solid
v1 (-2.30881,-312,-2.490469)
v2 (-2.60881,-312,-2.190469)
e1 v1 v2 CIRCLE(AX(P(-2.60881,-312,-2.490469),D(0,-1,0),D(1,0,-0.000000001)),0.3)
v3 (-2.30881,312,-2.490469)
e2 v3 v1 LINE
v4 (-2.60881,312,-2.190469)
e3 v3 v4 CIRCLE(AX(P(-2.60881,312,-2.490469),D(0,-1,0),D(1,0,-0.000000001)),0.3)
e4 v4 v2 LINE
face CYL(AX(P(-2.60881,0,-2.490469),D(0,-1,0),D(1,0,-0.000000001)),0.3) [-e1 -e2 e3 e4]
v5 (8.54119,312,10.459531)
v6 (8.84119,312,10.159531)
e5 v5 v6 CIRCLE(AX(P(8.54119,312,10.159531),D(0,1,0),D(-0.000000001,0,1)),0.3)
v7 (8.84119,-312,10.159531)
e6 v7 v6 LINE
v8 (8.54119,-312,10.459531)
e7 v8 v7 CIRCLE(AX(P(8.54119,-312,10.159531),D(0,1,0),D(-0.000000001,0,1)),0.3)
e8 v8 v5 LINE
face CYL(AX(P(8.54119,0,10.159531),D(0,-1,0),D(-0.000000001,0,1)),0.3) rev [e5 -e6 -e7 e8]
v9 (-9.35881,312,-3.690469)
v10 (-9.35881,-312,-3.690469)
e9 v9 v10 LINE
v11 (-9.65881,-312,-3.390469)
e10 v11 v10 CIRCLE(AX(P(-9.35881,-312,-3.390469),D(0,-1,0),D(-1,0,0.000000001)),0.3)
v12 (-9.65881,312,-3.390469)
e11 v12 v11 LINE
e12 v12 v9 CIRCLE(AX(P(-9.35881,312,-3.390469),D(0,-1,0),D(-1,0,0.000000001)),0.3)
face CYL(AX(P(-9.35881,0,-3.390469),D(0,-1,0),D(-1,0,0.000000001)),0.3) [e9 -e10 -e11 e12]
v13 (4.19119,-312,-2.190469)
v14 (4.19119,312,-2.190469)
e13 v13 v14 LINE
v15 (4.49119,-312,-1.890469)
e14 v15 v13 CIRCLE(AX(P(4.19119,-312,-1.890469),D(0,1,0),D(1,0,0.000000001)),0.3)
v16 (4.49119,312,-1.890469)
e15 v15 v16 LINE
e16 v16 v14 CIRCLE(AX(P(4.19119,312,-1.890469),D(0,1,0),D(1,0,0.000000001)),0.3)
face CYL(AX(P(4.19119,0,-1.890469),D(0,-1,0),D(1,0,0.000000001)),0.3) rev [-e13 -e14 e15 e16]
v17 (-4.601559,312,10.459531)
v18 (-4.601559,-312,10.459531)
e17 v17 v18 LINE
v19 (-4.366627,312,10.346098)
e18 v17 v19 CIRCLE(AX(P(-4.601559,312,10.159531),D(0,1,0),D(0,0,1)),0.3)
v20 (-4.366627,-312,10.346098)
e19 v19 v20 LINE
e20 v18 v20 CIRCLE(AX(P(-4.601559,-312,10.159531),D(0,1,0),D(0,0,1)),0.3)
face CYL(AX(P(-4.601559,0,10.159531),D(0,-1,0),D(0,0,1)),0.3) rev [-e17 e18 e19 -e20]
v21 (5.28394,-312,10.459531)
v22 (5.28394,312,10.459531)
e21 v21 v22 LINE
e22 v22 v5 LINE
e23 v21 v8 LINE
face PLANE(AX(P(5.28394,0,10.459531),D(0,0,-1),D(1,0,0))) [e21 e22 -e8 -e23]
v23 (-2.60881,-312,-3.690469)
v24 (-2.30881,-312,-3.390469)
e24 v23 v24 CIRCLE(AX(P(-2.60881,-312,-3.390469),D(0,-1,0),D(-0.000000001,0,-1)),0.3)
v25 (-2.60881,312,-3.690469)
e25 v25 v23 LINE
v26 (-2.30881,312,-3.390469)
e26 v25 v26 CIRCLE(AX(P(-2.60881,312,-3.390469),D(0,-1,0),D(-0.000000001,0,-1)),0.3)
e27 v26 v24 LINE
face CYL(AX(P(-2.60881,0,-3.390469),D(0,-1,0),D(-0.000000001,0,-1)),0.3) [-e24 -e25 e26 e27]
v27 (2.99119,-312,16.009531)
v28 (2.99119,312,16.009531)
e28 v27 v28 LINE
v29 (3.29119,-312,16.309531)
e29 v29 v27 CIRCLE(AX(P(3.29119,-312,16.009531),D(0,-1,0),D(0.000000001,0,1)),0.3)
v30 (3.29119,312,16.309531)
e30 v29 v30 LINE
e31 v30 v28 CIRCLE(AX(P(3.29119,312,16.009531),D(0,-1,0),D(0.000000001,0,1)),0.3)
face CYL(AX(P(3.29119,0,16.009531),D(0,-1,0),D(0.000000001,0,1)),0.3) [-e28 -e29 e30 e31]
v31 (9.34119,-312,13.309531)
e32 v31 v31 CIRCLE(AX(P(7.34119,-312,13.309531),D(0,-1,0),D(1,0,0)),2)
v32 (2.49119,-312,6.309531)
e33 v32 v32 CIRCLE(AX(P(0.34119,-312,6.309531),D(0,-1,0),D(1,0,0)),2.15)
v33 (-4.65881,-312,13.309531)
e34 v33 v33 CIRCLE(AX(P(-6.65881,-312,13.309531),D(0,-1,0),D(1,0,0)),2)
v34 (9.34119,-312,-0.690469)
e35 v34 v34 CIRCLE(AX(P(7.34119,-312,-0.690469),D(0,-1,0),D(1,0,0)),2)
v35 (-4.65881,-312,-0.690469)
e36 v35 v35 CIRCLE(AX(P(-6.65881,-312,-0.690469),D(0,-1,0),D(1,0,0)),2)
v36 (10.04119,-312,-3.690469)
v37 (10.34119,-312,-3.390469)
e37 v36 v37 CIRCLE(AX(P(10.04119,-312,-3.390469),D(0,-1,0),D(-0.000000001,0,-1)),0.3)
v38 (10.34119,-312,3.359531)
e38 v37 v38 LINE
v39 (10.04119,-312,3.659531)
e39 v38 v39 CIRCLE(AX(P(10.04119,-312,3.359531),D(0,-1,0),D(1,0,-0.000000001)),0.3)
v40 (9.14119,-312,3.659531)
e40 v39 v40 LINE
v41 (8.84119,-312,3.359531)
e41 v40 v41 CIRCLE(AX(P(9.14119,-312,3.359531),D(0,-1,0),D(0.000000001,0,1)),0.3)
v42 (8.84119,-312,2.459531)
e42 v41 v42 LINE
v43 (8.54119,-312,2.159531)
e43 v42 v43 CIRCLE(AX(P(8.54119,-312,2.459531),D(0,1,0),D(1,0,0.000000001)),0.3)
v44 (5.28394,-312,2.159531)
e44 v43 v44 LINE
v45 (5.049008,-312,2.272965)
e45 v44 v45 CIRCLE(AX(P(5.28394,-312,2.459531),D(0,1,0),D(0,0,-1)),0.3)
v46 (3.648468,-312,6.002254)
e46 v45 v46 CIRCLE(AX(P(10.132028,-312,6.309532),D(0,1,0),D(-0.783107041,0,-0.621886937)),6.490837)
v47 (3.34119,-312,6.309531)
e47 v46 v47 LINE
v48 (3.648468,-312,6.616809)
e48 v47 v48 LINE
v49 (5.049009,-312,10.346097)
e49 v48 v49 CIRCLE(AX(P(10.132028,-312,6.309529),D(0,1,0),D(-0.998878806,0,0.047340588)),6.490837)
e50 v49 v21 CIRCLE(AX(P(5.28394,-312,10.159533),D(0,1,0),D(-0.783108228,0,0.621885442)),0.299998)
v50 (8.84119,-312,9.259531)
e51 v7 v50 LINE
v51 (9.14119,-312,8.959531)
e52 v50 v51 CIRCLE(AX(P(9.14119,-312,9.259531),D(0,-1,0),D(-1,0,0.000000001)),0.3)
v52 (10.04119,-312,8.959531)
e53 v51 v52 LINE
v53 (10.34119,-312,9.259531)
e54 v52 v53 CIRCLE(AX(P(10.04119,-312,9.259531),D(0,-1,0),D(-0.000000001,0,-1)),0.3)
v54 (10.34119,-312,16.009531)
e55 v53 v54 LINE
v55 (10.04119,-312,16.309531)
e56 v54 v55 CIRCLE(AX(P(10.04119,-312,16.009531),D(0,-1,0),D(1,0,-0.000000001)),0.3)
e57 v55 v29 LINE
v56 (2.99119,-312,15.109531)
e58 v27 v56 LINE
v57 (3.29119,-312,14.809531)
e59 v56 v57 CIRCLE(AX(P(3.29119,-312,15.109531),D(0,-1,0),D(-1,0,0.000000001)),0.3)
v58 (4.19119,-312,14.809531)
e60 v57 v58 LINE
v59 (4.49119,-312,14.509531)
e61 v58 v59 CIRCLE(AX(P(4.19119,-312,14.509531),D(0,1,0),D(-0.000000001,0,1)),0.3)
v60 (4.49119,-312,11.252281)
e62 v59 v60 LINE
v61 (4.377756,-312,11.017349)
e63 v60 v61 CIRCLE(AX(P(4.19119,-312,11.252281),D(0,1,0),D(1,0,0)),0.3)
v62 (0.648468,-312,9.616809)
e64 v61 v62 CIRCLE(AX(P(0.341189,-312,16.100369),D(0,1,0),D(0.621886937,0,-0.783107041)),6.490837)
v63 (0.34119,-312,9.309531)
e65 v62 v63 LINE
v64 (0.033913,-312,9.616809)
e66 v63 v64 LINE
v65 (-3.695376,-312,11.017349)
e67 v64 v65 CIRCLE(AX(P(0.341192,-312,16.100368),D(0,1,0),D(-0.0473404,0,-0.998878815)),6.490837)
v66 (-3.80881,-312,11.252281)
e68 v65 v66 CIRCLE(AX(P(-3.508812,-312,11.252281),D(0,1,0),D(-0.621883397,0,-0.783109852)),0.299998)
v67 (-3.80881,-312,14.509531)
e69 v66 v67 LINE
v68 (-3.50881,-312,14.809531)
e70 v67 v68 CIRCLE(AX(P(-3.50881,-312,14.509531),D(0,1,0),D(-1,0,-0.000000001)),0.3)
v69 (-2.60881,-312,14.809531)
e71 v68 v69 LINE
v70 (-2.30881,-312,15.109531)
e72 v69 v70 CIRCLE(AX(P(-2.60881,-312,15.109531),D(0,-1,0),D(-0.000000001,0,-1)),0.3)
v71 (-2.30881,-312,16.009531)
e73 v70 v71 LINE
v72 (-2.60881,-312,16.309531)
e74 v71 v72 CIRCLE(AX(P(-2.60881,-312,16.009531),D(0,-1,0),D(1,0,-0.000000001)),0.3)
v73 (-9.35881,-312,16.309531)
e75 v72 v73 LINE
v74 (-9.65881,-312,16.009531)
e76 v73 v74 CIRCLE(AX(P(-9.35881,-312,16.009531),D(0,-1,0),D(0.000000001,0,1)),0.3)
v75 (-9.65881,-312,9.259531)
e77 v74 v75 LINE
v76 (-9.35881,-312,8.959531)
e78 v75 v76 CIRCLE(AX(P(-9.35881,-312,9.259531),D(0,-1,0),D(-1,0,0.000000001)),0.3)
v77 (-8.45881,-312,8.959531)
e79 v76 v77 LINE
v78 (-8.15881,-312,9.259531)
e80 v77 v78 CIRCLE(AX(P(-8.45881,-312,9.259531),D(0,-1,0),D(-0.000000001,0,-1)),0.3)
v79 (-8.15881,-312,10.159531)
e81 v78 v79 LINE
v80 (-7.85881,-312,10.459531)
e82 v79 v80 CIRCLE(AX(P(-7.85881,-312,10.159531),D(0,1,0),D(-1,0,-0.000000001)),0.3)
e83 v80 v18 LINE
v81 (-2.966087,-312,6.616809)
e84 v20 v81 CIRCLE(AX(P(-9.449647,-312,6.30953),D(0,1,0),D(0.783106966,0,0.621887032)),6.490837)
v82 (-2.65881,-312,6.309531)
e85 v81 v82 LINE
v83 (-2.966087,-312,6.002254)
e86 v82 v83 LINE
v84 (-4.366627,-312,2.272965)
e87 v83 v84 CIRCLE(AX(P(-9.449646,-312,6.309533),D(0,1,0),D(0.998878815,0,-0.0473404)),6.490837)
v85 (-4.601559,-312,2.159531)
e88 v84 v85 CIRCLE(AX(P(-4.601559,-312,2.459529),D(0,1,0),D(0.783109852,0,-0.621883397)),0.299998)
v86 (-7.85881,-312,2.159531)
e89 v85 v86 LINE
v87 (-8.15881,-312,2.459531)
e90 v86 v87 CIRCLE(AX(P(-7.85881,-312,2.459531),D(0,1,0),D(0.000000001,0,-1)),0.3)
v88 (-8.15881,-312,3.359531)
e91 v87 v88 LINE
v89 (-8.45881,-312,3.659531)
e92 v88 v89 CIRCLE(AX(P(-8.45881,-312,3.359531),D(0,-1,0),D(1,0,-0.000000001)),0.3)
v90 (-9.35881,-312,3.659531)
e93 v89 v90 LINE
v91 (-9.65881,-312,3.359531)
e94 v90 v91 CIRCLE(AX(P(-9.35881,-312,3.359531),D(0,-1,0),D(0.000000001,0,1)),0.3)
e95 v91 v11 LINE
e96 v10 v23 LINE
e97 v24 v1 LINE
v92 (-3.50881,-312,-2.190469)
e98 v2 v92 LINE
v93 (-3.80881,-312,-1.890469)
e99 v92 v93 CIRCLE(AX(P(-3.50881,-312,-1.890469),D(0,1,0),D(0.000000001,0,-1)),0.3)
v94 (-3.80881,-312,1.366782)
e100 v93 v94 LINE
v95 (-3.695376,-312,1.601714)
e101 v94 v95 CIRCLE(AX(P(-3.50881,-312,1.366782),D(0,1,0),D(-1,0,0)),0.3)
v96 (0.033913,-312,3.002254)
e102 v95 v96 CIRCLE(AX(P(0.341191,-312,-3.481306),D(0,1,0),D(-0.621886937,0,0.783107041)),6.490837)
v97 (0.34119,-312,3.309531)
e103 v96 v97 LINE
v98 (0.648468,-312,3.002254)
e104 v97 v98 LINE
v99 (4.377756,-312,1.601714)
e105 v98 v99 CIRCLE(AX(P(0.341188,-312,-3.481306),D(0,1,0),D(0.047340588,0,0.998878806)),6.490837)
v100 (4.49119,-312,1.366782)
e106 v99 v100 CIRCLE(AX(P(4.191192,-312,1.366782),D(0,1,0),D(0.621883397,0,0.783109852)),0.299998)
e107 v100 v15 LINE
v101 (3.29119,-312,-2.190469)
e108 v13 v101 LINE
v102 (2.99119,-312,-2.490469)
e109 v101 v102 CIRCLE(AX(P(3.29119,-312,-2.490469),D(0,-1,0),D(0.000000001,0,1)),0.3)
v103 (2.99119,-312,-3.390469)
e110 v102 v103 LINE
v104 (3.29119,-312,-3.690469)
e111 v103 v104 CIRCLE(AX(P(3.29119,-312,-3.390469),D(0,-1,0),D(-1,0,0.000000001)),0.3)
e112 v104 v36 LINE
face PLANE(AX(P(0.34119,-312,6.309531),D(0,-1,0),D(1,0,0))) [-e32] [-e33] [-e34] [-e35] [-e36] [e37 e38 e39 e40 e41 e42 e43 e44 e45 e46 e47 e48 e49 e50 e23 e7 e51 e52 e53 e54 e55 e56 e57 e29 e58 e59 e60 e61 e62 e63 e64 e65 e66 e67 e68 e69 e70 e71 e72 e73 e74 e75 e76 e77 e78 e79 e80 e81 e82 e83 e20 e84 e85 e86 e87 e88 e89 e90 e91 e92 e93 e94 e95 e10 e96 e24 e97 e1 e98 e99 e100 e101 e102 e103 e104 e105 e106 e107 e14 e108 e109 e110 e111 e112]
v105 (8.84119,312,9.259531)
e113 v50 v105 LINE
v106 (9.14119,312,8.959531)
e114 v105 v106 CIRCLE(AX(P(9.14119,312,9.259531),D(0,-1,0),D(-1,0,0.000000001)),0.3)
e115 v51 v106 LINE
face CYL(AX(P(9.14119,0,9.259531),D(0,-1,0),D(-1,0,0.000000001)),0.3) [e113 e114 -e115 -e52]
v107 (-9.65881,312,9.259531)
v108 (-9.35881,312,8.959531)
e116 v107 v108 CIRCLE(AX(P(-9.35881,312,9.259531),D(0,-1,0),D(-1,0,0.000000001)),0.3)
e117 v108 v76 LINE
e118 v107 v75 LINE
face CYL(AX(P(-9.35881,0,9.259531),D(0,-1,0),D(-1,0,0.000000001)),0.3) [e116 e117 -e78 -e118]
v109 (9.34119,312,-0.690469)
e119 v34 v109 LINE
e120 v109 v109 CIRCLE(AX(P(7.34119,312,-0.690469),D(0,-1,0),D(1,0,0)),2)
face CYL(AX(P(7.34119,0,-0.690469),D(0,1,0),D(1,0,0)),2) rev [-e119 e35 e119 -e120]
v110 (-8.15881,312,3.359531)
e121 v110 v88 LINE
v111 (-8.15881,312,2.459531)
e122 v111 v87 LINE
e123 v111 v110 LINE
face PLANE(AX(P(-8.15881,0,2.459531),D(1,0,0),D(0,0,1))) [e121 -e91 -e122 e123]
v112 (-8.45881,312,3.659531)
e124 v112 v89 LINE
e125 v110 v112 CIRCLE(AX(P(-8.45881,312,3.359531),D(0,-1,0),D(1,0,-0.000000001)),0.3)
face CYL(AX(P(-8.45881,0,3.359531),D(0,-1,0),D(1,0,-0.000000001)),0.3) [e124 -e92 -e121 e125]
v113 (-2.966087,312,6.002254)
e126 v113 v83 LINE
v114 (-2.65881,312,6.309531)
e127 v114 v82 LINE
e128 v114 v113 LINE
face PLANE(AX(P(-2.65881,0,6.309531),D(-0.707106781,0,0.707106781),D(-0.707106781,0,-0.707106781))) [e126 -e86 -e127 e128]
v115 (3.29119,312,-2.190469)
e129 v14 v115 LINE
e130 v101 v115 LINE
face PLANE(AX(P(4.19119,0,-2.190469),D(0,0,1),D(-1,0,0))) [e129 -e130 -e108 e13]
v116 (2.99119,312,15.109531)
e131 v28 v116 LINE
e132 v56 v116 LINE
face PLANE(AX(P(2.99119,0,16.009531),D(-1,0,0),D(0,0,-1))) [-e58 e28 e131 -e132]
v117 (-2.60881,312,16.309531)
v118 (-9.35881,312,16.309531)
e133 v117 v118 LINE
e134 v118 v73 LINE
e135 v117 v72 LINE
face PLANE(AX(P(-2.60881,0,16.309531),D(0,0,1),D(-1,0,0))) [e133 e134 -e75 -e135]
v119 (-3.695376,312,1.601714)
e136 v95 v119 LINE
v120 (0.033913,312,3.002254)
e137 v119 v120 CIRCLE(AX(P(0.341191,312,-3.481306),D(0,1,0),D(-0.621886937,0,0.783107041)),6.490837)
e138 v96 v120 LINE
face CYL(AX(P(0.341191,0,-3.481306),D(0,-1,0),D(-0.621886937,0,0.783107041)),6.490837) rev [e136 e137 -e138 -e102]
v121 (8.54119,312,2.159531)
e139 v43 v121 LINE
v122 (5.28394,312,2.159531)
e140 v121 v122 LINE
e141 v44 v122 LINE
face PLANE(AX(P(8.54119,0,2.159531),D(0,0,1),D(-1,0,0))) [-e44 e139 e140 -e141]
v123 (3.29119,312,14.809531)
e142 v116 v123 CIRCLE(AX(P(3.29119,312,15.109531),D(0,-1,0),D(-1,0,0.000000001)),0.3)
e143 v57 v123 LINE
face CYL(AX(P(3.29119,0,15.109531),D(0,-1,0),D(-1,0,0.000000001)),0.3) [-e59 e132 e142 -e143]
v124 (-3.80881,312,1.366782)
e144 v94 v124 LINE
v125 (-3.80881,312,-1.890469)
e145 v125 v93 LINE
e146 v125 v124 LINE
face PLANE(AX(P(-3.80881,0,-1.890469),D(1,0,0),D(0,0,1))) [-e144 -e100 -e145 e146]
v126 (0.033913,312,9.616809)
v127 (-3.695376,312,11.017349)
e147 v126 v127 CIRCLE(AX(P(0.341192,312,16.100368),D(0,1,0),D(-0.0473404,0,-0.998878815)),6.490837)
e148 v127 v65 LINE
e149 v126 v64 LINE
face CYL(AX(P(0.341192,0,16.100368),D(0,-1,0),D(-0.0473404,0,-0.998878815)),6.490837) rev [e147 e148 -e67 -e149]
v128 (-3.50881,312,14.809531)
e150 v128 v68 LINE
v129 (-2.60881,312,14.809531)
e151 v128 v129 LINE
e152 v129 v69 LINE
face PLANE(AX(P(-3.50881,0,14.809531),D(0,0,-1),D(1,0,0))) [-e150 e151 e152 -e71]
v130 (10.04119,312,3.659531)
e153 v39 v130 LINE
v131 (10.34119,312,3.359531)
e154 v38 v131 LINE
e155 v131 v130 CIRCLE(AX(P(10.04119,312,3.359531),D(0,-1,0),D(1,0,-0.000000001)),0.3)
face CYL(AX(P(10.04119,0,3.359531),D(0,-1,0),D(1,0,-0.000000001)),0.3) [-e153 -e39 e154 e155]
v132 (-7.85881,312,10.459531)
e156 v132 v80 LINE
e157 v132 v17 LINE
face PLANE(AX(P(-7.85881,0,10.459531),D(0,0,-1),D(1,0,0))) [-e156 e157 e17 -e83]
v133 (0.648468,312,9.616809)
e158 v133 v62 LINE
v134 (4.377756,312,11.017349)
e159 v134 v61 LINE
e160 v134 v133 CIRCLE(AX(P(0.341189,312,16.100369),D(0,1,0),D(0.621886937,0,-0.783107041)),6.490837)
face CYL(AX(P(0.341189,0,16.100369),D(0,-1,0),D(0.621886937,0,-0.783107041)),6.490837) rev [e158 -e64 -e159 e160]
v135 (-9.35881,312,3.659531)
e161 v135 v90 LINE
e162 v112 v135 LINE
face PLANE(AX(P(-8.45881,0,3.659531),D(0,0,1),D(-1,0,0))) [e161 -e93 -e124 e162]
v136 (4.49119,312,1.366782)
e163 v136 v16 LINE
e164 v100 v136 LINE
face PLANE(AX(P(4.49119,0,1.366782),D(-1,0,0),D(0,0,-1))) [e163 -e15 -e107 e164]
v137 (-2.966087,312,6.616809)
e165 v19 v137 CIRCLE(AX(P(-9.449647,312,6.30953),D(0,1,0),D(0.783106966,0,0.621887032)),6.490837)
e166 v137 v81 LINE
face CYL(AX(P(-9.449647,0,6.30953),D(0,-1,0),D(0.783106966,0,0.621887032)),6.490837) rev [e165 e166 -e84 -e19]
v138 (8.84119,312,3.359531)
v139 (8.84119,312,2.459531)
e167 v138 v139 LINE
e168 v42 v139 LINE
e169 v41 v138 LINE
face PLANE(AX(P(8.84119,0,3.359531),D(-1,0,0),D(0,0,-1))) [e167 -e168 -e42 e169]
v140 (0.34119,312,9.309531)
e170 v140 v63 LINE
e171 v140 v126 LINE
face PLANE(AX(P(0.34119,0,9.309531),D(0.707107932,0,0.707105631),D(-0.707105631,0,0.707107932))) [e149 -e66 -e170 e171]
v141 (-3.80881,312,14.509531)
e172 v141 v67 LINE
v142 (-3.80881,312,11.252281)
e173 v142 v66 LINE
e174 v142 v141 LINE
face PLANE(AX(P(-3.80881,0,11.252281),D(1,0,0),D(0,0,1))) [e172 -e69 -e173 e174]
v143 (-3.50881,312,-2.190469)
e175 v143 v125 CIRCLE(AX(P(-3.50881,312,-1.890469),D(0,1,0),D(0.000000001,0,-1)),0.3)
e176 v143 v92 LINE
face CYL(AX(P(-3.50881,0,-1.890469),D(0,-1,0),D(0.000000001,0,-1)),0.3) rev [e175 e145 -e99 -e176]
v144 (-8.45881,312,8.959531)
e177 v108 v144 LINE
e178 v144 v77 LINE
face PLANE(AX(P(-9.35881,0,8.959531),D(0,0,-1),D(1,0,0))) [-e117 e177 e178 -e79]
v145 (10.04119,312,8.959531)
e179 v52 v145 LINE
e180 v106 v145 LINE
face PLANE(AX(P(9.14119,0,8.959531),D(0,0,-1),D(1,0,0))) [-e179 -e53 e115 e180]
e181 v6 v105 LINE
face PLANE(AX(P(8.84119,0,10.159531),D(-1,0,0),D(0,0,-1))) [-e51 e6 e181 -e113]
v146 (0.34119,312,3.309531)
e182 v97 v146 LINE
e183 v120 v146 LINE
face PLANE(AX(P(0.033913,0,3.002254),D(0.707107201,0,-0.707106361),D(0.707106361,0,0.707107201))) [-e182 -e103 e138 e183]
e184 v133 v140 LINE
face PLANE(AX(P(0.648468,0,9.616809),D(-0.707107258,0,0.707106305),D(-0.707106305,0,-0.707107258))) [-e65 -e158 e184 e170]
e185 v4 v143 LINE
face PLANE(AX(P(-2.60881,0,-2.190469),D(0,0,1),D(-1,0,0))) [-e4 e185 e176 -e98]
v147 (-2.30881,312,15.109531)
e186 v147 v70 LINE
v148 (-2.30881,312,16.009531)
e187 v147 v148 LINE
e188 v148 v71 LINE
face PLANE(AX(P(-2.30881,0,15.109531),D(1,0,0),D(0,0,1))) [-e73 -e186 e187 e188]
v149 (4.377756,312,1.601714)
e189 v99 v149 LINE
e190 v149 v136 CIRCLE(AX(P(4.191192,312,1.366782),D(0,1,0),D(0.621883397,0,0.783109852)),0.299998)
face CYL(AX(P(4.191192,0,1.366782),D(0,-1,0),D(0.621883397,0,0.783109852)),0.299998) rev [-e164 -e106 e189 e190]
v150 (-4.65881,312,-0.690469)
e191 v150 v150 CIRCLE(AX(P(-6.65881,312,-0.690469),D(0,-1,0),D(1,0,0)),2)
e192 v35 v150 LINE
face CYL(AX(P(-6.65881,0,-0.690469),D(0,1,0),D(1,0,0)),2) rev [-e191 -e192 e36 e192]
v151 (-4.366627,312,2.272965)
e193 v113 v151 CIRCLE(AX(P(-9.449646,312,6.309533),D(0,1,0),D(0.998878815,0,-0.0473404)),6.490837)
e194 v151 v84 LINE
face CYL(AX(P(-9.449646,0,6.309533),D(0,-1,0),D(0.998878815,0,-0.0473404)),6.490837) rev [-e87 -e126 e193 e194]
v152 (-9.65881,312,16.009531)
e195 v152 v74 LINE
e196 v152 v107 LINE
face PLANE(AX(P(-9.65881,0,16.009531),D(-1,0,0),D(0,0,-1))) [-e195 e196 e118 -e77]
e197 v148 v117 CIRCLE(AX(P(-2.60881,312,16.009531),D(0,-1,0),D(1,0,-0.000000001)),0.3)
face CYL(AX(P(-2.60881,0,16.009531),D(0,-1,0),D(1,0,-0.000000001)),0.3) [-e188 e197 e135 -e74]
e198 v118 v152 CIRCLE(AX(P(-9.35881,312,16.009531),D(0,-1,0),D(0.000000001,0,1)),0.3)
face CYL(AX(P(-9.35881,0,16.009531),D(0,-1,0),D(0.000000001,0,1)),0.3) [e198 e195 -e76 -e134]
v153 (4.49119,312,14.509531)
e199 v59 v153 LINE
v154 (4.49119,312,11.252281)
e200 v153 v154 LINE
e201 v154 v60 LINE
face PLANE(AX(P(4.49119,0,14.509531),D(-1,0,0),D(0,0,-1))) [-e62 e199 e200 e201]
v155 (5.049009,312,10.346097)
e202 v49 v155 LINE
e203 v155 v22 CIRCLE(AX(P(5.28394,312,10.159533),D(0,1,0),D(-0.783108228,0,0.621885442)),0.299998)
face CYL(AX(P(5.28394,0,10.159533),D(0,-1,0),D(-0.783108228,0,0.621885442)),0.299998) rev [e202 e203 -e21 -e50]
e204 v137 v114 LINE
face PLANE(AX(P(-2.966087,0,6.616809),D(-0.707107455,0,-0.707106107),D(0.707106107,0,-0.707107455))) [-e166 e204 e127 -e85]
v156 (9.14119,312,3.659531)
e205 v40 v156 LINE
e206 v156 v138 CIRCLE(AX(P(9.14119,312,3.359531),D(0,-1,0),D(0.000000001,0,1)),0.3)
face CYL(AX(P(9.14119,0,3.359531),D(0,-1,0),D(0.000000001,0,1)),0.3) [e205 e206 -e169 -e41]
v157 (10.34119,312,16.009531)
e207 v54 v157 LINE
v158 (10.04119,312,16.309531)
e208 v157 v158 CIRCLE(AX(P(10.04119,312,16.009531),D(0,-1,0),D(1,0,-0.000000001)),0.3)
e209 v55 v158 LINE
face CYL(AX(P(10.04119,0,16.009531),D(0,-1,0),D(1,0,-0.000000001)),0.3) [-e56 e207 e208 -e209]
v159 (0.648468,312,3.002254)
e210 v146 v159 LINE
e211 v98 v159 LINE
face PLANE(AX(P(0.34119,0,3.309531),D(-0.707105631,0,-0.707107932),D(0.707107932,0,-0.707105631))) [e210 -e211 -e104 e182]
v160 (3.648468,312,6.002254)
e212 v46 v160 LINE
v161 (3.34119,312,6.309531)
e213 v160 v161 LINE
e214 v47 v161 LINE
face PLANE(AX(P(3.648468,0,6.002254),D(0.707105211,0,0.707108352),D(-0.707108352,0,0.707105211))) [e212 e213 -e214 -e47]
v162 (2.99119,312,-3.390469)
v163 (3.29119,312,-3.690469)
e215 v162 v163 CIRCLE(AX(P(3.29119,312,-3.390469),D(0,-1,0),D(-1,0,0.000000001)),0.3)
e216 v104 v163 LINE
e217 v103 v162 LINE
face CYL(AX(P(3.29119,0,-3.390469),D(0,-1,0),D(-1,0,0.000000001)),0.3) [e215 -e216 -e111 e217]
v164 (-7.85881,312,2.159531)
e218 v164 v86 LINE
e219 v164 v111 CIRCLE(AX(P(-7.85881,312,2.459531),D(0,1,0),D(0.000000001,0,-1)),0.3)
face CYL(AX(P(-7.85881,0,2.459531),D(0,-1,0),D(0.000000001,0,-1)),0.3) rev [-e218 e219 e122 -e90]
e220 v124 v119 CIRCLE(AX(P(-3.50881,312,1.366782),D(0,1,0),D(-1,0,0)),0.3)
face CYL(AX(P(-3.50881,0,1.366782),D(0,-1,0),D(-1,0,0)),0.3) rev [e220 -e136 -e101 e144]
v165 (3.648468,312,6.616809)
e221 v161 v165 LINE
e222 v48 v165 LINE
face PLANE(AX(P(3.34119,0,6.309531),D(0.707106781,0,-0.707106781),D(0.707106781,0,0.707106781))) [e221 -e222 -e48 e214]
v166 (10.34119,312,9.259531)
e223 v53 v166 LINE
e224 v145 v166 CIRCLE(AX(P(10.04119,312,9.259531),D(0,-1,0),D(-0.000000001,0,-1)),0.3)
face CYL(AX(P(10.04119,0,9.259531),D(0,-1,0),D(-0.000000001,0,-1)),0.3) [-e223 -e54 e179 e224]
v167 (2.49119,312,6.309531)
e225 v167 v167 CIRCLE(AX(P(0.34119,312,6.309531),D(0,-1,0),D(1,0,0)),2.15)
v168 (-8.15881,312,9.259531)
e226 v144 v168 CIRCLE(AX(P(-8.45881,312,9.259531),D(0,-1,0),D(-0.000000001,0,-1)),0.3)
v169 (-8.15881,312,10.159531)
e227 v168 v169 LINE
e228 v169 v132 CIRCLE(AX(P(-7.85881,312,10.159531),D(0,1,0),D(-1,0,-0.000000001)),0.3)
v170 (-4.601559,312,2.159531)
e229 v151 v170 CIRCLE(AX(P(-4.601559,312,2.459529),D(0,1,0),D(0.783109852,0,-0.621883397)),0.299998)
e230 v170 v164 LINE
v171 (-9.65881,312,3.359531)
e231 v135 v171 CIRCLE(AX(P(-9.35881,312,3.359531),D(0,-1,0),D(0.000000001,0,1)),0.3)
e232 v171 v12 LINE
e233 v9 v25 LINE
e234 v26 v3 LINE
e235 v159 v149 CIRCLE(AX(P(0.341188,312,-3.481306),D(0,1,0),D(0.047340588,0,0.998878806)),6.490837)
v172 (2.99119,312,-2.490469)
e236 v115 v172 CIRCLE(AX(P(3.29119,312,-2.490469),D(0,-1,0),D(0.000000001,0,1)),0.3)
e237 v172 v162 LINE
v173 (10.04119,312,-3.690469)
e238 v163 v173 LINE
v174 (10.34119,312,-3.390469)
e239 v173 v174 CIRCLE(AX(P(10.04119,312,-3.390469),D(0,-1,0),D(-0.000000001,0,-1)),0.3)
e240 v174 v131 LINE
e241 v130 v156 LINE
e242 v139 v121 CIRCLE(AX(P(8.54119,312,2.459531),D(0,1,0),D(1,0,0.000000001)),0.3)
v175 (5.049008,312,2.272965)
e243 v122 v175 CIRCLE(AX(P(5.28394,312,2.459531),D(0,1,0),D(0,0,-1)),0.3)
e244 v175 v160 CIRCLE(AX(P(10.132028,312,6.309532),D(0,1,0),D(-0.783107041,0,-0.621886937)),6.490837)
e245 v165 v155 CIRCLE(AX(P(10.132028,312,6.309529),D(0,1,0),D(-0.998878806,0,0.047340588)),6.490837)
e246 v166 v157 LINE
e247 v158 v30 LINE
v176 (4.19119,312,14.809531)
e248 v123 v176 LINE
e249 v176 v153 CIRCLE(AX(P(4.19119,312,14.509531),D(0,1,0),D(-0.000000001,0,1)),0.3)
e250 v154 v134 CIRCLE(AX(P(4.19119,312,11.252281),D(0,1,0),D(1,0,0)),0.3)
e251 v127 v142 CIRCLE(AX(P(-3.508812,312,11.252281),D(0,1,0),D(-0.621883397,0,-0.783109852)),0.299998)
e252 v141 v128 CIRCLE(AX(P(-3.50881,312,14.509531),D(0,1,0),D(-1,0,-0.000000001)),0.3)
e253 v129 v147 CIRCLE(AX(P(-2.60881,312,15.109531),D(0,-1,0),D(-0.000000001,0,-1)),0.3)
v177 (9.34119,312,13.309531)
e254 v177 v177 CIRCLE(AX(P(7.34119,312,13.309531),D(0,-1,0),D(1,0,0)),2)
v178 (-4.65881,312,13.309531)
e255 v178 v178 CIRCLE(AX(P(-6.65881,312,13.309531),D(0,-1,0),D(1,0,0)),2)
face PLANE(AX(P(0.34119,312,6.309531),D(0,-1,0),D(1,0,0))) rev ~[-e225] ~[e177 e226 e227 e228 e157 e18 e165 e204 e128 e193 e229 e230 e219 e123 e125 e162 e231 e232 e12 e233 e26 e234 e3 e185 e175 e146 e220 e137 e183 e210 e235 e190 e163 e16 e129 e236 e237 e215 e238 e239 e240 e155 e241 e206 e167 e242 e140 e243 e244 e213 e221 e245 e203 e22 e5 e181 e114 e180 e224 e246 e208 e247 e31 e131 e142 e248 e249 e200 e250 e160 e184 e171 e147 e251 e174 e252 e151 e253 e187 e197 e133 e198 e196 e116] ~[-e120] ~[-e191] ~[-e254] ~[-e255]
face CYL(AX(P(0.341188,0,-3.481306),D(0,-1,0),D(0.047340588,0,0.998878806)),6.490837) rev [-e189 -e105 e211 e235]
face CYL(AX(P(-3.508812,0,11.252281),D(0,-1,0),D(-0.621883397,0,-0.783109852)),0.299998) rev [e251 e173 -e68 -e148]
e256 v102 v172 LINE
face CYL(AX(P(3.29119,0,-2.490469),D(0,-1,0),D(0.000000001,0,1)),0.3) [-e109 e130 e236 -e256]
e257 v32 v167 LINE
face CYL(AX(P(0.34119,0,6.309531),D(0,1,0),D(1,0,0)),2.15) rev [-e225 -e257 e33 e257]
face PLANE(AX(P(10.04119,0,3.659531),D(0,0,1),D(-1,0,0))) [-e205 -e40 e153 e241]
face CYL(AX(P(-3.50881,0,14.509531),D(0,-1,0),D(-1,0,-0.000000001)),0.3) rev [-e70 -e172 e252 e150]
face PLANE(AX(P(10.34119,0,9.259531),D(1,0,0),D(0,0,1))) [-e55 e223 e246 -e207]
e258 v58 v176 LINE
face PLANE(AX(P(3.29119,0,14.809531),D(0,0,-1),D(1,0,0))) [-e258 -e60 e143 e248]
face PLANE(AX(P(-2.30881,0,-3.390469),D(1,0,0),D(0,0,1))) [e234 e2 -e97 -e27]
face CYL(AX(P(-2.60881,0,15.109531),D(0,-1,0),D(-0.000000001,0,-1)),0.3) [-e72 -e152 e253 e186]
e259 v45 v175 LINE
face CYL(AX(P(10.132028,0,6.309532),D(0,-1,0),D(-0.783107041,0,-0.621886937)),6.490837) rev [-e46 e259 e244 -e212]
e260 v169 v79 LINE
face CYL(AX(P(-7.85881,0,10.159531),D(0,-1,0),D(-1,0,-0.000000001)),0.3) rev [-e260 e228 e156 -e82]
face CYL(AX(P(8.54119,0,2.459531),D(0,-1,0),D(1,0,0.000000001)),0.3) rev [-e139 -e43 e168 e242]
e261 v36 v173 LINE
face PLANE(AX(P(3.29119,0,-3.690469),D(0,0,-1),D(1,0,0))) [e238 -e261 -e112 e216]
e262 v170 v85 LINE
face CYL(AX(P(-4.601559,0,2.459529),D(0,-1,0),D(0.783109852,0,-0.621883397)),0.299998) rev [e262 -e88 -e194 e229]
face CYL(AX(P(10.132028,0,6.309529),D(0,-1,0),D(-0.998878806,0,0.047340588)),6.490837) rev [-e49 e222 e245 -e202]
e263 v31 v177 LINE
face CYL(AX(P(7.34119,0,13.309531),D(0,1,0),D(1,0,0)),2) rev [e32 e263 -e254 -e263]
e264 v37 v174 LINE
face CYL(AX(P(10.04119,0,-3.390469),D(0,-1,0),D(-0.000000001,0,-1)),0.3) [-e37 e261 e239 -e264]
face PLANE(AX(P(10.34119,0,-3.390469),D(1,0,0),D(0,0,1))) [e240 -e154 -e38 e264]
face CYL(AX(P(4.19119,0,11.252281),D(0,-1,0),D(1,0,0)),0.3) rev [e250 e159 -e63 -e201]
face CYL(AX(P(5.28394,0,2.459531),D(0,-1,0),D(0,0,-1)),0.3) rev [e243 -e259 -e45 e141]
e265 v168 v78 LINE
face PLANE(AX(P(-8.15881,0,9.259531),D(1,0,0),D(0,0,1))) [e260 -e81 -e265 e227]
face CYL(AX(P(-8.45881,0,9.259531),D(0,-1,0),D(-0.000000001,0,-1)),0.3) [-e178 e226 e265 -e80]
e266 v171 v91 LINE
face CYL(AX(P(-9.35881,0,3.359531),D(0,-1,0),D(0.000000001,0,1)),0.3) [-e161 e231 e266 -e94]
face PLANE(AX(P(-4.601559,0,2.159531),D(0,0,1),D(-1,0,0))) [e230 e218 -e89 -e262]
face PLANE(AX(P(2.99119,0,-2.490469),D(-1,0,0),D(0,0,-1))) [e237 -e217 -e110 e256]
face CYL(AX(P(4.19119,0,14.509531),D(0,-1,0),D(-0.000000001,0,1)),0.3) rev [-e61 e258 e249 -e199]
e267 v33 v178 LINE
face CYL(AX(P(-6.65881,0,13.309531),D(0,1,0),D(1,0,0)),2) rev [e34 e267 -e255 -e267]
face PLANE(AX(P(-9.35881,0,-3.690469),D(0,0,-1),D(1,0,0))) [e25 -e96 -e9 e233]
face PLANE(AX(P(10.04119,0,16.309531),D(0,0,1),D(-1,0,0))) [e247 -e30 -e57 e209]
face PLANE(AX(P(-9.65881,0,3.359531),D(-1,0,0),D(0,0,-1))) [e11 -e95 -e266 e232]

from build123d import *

# Parameters (mm, degrees)
F0_R     = 2
F0_R_2   = 2.15
F1_DEPTH = 312


# Not quite as in the source:
# - ends of sketch curves that miss each other by under 0.0002 mm in the source are joined


with BuildPart() as f1:
    # F0 (on Front) → F1 (new body, symmetric)
    with BuildSketch(Plane.XZ):
        with BuildLine():
            Line((4.49119, 14.509531), (4.49119, 11.252281))
            ThreePointArc((4.49119, 11.252281), (4.4613472004, 11.1218391084), (4.377756086, 11.0173488916))
            ThreePointArc((4.377756086, 11.0173488916), (2.6232116259, 10.0239112371), (0.6484679813, 9.6168093955))
            Line((0.6484679813, 9.6168093955), (0.34119, 9.309531))
            Line((0.34119, 9.309531), (0.033913, 9.616809))
            ThreePointArc((0.033913, 9.616809), (-1.9408311583, 10.0239110615), (-3.695375823, 11.0173492229))
            ThreePointArc((-3.695375823, 11.0173492229), (-3.7789672004, 11.1218391084), (-3.80881, 11.252281))
            Line((-3.80881, 11.252281), (-3.80881, 14.509531))
            ThreePointArc((-3.80881, 14.509531), (-3.7209420344, 14.7216630344), (-3.50881, 14.809531))
            Line((-3.50881, 14.809531), (-2.60881, 14.809531))
            ThreePointArc((-2.60881, 14.809531), (-2.3966779656, 14.8973989656), (-2.30881, 15.109531))
            Line((-2.30881, 15.109531), (-2.30881, 16.009531))
            ThreePointArc((-2.30881, 16.009531), (-2.3966779656, 16.2216630344), (-2.60881, 16.309531))
            Line((-2.60881, 16.309531), (-9.35881, 16.309531))
            ThreePointArc((-9.35881, 16.309531), (-9.5709420344, 16.2216630344), (-9.65881, 16.009531))
            Line((-9.65881, 16.009531), (-9.65881, 9.259531))
            ThreePointArc((-9.65881, 9.259531), (-9.5709420344, 9.0473989656), (-9.35881, 8.959531))
            Line((-9.35881, 8.959531), (-8.45881, 8.959531))
            ThreePointArc((-8.45881, 8.959531), (-8.2466779656, 9.0473989656), (-8.15881, 9.259531))
            Line((-8.15881, 9.259531), (-8.15881, 10.159531))
            ThreePointArc((-8.15881, 10.159531), (-8.0709420344, 10.3716630344), (-7.85881, 10.459531))
            Line((-7.85881, 10.459531), (-4.601559, 10.459531))
            ThreePointArc((-4.601559, 10.459531), (-4.471117461, 10.4296883706), (-4.3666273786, 10.3460976993))
            ThreePointArc((-4.3666273786, 10.3460976993), (-3.3731893747, 8.5915529924), (-2.9660873955, 6.6168089813))
            Line((-2.9660873955, 6.6168089813), (-2.65881, 6.309531))
            Line((-2.65881, 6.309531), (-2.966087, 6.002254))
            ThreePointArc((-2.966087, 6.002254), (-3.3731890615, 4.0275098417), (-4.3666272229, 2.272965177))
            ThreePointArc((-4.3666272229, 2.272965177), (-4.4711171084, 2.1893737996), (-4.601559, 2.159531))
            Line((-4.601559, 2.159531), (-7.85881, 2.159531))
            ThreePointArc((-7.85881, 2.159531), (-8.0709420344, 2.2473989656), (-8.15881, 2.459531))
            Line((-8.15881, 2.459531), (-8.15881, 3.359531))
            ThreePointArc((-8.15881, 3.359531), (-8.2466779656, 3.5716630344), (-8.45881, 3.659531))
            Line((-8.45881, 3.659531), (-9.35881, 3.659531))
            ThreePointArc((-9.35881, 3.659531), (-9.5709420344, 3.5716630344), (-9.65881, 3.359531))
            Line((-9.65881, 3.359531), (-9.65881, -3.390469))
            ThreePointArc((-9.65881, -3.390469), (-9.5709420344, -3.6026010344), (-9.35881, -3.690469))
            Line((-9.35881, -3.690469), (-2.60881, -3.690469))
            ThreePointArc((-2.60881, -3.690469), (-2.3966779656, -3.6026010344), (-2.30881, -3.390469))
            Line((-2.30881, -3.390469), (-2.30881, -2.490469))
            ThreePointArc((-2.30881, -2.490469), (-2.3966779656, -2.2783369656), (-2.60881, -2.190469))
            Line((-2.60881, -2.190469), (-3.50881, -2.190469))
            ThreePointArc((-3.50881, -2.190469), (-3.7209420344, -2.1026010344), (-3.80881, -1.890469))
            Line((-3.80881, -1.890469), (-3.80881, 1.366782))
            ThreePointArc((-3.80881, 1.366782), (-3.7789672004, 1.4972238916), (-3.695376086, 1.6017141084))
            ThreePointArc((-3.695376086, 1.6017141084), (-1.9408311583, 2.5951519385), (0.0339130165, 3.0022536517))
            Line((0.0339130165, 3.0022536517), (0.34119, 3.309531))
            Line((0.34119, 3.309531), (0.648468, 3.002254))
            ThreePointArc((0.648468, 3.002254), (2.6232116259, 2.5951517629), (4.377755823, 1.6017137771))
            ThreePointArc((4.377755823, 1.6017137771), (4.4613472004, 1.4972238916), (4.49119, 1.366782))
            Line((4.49119, 1.366782), (4.49119, -1.890469))
            ThreePointArc((4.49119, -1.890469), (4.4033220344, -2.1026010344), (4.19119, -2.190469))
            Line((4.19119, -2.190469), (3.29119, -2.190469))
            ThreePointArc((3.29119, -2.190469), (3.0790579656, -2.2783369656), (2.99119, -2.490469))
            Line((2.99119, -2.490469), (2.99119, -3.390469))
            ThreePointArc((2.99119, -3.390469), (3.0790579656, -3.6026010344), (3.29119, -3.690469))
            Line((3.29119, -3.690469), (10.04119, -3.690469))
            ThreePointArc((10.04119, -3.690469), (10.2533220344, -3.6026010344), (10.34119, -3.390469))
            Line((10.34119, -3.390469), (10.34119, 3.359531))
            ThreePointArc((10.34119, 3.359531), (10.2533220344, 3.5716630344), (10.04119, 3.659531))
            Line((10.04119, 3.659531), (9.14119, 3.659531))
            ThreePointArc((9.14119, 3.659531), (8.9290579656, 3.5716630344), (8.84119, 3.359531))
            Line((8.84119, 3.359531), (8.84119, 2.459531))
            ThreePointArc((8.84119, 2.459531), (8.7533220344, 2.2473989656), (8.54119, 2.159531))
            Line((8.54119, 2.159531), (5.28394, 2.159531))
            ThreePointArc((5.28394, 2.159531), (5.1534981084, 2.1893737996), (5.0490078916, 2.272964914))
            ThreePointArc((5.0490078916, 2.272964914), (4.0555700615, 4.0275098417), (3.6484683483, 6.0022540165))
            Line((3.6484683483, 6.0022540165), (3.34119, 6.309531))
            Line((3.34119, 6.309531), (3.648468, 6.616809))
            ThreePointArc((3.648468, 6.616809), (4.0555703747, 8.5915529924), (5.0490087099, 10.3460974363))
            ThreePointArc((5.0490087099, 10.3460974363), (5.153498461, 10.4296883706), (5.28394, 10.459531))
            Line((5.28394, 10.459531), (8.54119, 10.459531))
            ThreePointArc((8.54119, 10.459531), (8.7533220344, 10.3716630344), (8.84119, 10.159531))
            Line((8.84119, 10.159531), (8.84119, 9.259531))
            ThreePointArc((8.84119, 9.259531), (8.9290579656, 9.0473989656), (9.14119, 8.959531))
            Line((9.14119, 8.959531), (10.04119, 8.959531))
            ThreePointArc((10.04119, 8.959531), (10.2533220344, 9.0473989656), (10.34119, 9.259531))
            Line((10.34119, 9.259531), (10.34119, 16.009531))
            ThreePointArc((10.34119, 16.009531), (10.2533220344, 16.2216630344), (10.04119, 16.309531))
            Line((10.04119, 16.309531), (3.29119, 16.309531))
            ThreePointArc((3.29119, 16.309531), (3.0790579656, 16.2216630344), (2.99119, 16.009531))
            Line((2.99119, 16.009531), (2.99119, 15.109531))
            ThreePointArc((2.99119, 15.109531), (3.0790579656, 14.8973989656), (3.29119, 14.809531))
            Line((3.29119, 14.809531), (4.19119, 14.809531))
            ThreePointArc((4.19119, 14.809531), (4.4033220344, 14.7216630344), (4.49119, 14.509531))
        make_face()
        with Locations((-6.65881, -0.690469)):
            Circle(F0_R, mode=Mode.SUBTRACT)
        with Locations((7.34119, -0.690469)):
            Circle(F0_R, mode=Mode.SUBTRACT)
        with Locations((-6.65881, 13.309531)):
            Circle(F0_R, mode=Mode.SUBTRACT)
        with Locations((0.34119, 6.309531)):
            Circle(F0_R_2, mode=Mode.SUBTRACT)
        with Locations((7.34119, 13.309531)):
            Circle(F0_R, mode=Mode.SUBTRACT)
    extrude(amount=F1_DEPTH, both=True)


solid = f1.part
